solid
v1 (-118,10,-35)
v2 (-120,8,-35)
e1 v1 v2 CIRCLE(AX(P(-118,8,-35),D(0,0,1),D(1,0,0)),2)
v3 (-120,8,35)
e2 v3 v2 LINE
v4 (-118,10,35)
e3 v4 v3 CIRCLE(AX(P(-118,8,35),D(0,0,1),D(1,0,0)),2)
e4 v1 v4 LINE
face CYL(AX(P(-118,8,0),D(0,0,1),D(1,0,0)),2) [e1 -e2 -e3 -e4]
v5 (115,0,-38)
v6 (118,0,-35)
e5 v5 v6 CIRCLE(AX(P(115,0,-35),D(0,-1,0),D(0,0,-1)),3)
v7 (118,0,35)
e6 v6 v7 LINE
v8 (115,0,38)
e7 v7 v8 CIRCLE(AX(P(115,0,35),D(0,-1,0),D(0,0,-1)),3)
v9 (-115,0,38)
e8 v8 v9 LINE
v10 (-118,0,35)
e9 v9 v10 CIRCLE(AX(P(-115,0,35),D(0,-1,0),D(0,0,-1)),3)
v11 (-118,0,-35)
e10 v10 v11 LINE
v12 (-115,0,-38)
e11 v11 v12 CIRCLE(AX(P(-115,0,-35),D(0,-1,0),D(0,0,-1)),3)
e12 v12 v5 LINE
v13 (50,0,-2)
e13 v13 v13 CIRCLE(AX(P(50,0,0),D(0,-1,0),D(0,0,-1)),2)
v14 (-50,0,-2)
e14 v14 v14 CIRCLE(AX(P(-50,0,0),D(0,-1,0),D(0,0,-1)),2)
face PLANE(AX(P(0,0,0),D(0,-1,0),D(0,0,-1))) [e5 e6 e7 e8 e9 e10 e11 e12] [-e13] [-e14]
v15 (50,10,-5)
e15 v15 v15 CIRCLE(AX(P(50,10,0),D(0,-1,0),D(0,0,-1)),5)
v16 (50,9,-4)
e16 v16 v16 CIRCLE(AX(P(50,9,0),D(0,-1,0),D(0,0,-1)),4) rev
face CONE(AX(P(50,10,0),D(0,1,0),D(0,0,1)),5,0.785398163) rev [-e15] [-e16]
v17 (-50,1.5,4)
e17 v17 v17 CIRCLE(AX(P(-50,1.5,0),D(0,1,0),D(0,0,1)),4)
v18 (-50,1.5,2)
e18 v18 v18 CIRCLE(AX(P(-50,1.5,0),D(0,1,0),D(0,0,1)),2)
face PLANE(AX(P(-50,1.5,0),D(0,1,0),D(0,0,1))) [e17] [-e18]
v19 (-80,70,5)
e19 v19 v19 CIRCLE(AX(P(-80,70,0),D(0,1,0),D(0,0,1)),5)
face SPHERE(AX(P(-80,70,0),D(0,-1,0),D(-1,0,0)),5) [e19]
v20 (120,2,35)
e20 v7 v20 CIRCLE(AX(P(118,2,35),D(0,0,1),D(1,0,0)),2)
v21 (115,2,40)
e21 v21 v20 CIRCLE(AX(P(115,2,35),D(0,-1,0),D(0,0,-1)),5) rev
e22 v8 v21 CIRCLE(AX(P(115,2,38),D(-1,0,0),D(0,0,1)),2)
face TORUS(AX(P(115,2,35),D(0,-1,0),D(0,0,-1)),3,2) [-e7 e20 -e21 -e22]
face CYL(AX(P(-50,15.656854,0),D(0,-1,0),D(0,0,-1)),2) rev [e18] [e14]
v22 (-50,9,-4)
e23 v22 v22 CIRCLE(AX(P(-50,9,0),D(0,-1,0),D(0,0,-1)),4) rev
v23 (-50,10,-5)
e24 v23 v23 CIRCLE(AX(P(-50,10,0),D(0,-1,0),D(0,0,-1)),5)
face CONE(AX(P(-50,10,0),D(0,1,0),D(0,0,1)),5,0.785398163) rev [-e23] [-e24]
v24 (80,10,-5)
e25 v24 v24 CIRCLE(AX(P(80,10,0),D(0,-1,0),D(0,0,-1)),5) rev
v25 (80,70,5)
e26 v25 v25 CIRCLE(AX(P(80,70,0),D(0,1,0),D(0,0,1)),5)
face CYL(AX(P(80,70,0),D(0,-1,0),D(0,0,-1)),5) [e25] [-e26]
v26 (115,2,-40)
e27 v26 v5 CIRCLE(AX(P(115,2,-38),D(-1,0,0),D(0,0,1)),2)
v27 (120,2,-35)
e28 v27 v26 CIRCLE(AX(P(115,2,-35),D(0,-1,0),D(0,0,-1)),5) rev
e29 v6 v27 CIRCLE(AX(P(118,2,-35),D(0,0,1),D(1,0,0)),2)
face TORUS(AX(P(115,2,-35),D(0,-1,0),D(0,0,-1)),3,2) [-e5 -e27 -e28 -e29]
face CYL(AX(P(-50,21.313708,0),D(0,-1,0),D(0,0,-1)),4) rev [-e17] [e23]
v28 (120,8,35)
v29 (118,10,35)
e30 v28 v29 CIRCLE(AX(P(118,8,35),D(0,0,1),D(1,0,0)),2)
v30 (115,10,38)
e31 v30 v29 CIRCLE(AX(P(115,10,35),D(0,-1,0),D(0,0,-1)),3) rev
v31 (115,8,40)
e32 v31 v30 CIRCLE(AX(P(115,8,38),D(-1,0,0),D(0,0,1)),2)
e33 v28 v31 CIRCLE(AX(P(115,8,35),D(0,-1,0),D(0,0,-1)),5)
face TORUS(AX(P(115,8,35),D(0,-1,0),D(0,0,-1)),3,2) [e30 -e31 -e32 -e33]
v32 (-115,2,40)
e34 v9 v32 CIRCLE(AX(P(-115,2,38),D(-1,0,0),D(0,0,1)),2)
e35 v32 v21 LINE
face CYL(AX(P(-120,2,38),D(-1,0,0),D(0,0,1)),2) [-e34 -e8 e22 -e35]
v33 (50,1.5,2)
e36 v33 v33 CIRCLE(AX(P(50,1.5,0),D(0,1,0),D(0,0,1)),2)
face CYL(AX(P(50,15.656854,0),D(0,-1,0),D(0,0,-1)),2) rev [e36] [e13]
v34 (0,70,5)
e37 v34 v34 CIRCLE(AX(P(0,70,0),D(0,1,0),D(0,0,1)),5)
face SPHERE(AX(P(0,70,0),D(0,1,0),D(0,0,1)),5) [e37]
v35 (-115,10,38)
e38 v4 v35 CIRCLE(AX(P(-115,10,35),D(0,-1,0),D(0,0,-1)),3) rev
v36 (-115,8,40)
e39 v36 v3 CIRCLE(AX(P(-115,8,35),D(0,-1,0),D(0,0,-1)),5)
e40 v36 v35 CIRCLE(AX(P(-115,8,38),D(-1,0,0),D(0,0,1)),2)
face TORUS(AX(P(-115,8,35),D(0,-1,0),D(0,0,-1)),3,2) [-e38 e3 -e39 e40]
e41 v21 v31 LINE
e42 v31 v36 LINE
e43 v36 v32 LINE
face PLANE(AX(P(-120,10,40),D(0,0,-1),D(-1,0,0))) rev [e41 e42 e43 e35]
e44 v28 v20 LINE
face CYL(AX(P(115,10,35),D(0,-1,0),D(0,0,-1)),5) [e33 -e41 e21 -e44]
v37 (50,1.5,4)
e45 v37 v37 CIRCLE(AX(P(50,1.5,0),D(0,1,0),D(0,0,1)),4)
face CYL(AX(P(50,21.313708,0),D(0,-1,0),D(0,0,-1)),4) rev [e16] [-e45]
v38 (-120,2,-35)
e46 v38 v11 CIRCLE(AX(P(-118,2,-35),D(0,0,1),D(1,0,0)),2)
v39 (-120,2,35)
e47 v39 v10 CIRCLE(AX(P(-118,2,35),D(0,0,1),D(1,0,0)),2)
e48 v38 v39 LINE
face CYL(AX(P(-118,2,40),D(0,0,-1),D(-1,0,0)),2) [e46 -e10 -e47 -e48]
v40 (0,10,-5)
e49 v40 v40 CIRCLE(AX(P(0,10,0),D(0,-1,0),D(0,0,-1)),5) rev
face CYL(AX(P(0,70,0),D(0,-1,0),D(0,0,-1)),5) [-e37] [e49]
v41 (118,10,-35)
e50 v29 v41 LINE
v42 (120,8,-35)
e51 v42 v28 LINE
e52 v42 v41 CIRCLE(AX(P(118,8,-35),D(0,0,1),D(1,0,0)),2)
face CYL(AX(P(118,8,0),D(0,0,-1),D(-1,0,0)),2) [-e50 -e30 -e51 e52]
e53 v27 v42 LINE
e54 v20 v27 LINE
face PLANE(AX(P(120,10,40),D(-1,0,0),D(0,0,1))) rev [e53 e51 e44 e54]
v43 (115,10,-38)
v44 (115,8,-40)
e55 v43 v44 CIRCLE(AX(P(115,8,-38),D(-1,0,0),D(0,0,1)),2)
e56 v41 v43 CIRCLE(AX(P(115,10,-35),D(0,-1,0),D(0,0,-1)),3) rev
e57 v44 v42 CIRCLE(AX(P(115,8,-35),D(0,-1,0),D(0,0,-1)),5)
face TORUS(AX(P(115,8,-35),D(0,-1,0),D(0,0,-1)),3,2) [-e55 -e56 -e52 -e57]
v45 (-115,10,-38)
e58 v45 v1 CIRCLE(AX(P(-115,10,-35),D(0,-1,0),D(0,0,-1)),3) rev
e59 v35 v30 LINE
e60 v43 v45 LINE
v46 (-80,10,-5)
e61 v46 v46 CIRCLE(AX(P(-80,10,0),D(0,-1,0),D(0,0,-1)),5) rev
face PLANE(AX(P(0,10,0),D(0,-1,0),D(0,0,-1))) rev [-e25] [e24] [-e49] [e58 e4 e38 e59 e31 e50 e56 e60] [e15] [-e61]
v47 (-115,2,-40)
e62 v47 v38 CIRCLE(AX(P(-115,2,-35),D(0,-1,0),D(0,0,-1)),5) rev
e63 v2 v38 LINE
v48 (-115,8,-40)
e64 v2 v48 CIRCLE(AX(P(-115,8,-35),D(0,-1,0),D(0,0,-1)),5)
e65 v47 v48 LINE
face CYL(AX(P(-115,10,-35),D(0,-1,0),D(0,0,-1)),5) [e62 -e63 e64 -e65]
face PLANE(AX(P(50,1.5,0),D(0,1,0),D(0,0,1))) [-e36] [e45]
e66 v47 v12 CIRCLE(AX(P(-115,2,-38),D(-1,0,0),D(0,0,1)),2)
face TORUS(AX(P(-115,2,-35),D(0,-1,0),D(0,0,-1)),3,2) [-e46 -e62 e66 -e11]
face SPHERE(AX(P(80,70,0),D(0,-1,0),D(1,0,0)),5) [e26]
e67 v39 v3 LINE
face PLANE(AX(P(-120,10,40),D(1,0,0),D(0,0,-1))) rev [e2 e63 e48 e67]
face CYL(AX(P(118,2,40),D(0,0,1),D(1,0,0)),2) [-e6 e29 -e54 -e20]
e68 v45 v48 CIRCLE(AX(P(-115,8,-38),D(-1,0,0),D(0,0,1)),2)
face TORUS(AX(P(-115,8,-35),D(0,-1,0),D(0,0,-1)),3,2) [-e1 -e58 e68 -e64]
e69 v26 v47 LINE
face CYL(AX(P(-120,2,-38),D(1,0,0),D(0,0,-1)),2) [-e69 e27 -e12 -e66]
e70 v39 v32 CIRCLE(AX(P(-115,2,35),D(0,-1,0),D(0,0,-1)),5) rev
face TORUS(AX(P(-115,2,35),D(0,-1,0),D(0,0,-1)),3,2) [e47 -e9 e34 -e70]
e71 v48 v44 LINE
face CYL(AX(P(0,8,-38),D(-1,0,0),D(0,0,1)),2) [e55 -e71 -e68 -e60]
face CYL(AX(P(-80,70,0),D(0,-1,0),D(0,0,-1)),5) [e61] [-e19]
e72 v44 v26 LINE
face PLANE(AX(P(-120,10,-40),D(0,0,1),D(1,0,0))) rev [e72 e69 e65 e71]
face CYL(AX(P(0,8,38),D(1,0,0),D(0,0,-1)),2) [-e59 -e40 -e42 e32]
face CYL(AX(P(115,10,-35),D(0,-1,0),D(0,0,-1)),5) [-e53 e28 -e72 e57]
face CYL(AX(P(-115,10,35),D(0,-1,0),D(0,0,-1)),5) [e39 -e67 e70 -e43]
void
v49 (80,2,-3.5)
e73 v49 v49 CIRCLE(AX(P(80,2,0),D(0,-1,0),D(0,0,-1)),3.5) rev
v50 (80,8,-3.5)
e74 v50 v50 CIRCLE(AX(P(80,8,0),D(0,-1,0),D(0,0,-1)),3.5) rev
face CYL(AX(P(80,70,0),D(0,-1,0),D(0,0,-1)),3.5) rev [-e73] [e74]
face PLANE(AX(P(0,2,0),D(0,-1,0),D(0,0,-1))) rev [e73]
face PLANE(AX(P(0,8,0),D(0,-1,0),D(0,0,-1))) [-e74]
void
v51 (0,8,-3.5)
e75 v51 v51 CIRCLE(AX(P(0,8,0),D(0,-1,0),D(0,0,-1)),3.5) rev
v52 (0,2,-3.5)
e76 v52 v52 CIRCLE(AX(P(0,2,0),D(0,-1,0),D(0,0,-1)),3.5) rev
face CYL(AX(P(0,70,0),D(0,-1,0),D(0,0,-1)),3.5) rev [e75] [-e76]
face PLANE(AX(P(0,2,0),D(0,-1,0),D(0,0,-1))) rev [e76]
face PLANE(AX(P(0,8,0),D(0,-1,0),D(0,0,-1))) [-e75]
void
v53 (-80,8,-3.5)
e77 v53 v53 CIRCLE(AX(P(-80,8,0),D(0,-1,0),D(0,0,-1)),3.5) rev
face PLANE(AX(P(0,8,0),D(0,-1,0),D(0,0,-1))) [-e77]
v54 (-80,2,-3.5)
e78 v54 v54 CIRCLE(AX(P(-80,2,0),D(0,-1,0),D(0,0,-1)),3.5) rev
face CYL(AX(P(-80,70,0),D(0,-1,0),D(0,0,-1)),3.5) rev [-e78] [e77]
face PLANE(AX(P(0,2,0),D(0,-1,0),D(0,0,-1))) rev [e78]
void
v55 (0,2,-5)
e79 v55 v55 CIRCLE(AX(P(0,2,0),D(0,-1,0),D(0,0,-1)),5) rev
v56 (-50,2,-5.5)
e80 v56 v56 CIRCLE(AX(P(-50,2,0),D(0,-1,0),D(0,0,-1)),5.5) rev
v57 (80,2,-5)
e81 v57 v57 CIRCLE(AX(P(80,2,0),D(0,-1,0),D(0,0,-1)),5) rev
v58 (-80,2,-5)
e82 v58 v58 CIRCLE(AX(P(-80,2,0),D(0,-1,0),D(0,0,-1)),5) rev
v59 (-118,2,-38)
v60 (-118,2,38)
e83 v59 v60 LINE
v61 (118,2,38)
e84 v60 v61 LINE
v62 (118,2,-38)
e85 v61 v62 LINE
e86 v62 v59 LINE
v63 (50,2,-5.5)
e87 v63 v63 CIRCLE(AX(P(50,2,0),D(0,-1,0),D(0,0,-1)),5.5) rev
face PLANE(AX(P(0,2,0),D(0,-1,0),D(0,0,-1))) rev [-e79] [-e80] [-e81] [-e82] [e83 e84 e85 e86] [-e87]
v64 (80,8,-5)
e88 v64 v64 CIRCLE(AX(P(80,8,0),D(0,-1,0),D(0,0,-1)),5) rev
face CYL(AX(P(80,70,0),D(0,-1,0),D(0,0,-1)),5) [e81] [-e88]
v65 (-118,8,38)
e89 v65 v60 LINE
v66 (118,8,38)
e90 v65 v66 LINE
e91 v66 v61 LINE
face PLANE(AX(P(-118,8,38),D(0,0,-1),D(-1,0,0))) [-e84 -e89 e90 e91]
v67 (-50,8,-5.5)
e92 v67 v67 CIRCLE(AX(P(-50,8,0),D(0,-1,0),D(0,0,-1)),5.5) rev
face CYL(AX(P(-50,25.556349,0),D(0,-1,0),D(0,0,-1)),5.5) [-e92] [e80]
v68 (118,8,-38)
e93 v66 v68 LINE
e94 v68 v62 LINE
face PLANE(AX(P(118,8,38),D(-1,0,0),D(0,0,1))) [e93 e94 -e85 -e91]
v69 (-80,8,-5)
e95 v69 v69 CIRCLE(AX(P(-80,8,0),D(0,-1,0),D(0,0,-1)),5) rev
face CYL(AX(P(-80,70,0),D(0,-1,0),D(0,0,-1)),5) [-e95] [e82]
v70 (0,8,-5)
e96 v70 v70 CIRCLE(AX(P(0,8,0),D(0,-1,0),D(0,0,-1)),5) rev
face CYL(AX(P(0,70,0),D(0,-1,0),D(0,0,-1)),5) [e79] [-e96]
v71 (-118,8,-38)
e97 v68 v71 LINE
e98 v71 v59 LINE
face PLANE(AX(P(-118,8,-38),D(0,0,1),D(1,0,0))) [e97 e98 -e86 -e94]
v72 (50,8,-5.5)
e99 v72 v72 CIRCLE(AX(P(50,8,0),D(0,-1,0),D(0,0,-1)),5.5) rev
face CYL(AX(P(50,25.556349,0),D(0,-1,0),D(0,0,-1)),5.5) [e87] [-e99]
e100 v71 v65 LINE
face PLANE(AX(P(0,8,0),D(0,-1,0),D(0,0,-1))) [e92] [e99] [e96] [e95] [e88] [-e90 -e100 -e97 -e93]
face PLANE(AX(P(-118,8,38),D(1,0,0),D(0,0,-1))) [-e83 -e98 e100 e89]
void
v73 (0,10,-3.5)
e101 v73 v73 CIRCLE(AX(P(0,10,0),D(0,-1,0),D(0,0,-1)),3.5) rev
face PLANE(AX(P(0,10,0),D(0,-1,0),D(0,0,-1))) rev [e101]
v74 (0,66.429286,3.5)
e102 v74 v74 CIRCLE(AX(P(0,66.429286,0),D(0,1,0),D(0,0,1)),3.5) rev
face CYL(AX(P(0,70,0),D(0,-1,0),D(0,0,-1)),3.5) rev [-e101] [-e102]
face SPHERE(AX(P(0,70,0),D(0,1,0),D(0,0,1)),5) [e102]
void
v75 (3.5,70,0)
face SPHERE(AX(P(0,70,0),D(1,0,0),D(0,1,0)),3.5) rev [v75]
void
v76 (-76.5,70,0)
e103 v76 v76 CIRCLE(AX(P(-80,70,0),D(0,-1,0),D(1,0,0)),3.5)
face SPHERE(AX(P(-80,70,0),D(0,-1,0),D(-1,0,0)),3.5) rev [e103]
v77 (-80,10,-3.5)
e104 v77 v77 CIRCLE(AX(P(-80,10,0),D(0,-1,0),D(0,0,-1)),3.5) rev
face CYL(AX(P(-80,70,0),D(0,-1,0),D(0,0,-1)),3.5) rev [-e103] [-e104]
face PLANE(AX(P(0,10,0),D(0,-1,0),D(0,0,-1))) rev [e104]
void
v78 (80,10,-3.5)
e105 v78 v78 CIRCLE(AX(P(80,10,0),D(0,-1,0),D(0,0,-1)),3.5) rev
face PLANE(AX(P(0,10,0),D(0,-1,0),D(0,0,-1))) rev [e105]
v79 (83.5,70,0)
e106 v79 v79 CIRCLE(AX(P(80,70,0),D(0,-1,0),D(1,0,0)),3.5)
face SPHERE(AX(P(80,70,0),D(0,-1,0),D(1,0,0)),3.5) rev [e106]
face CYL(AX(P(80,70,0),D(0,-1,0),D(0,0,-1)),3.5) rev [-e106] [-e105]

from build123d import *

# Parameters (mm, degrees)
SKETCH_4_W          = 240
SKETCH_4_H          = 80
EXTRUDE_2_DEPTH     = 10
CUT_EXTRUDE_START   = 2
SKETCH_5_W          = 236
SKETCH_5_H          = 76
CUT_EXTRUDE_1_DEPTH = 6
FILLET_2_R          = 5
FILLET_1_R          = 2
SKETCH_6_R          = 5
SKETCH_6_R_2        = 3.5
EXTRUDE_3_DEPTH     = 70
CUT_EXTRUDE_2_REACH = 148.068
CUT_EXTRUDE_START_2 = 1.5
SKETCH_7_R          = 4
SKETCH_8_R          = 5.5
SKETCH_8_R_2        = 4
EXTRUDE_4_DEPTH     = 10
SKETCH_9_R          = 2
CUT_EXTRUDE_3_DEPTH = 10
CHAMFER_1_SIZE      = 1


# Read off the part's stored shape, not the designer's step: 旋转1, 旋转2
with BuildPart() as part:
    # 草图4 → 凸台-拉伸2 (new body)
    with BuildSketch(Plane(origin=(0, 0, 0), x_dir=(1, 0, 0), z_dir=(0, 1, 0))):
        Rectangle(SKETCH_4_W, SKETCH_4_H)
    extrude(amount=EXTRUDE_2_DEPTH)

    # 草图5 → 切除-拉伸1 (cut)
    with BuildSketch(Plane(origin=(0, 0, 0), x_dir=(1, 0, 0), z_dir=(0, 1, 0)).offset(CUT_EXTRUDE_START)):
        Rectangle(SKETCH_5_W, SKETCH_5_H)
    extrude(amount=CUT_EXTRUDE_1_DEPTH, mode=Mode.SUBTRACT)

    # 圆角2
    fillet_2_edges = [part.edges().sort_by_distance(p)[0] for p in [
        (120, 5, 40),
        (-120, 5, 40),
        (-120, 5, -40),
        (120, 5, -40),
    ]]
    fillet(fillet_2_edges, radius=FILLET_2_R)

    # 圆角1
    fillet_1_edges = [part.edges().sort_by_distance(p)[0] for p in [
        (120, 0, 0),
        (120, 10, 0),
        (0, 0, 40),
        (-120, 0, 0),
        (0, 0, -40),
        (118.535533906, 0, -38.535533906),
        (-118.535533906, 0, -38.535533906),
        (-118.535533906, 0, 38.535533906),
        (118.535533906, 0, 38.535533906),
        (0, 10, 40),
        (0, 10, -40),
        (-120, 10, 0),
        (118.535533906, 10, -38.535533906),
        (-118.535533906, 10, -38.535533906),
        (-118.535533906, 10, 38.535533906),
        (118.535533906, 10, 38.535533906),
    ]]
    fillet(fillet_1_edges, radius=FILLET_1_R)

    # 草图6 → 凸台-拉伸3 (add)
    # profile 1 of 3: a face of its own
    with BuildSketch(Plane(origin=(0, 0, 0), x_dir=(1, 0, 0), z_dir=(0, 1, 0))):
        with Locations(Location((-80, 0, 0), (0, 0, 90))):
            Circle(SKETCH_6_R)
        with Locations(Location((-80, 0, 0), (0, 0, 90))):
            Circle(SKETCH_6_R_2, mode=Mode.SUBTRACT)
    # profile 2 of 3: a face of its own
    with BuildSketch(Plane(origin=(0, 0, 0), x_dir=(1, 0, 0), z_dir=(0, 1, 0))):
        with Locations(Location((0, 0, 0), (0, 0, 90))):
            Circle(SKETCH_6_R)
        with Locations(Location((0, 0, 0), (0, 0, 90))):
            Circle(SKETCH_6_R_2, mode=Mode.SUBTRACT)
    # profile 3 of 3: a face of its own
    with BuildSketch(Plane(origin=(0, 0, 0), x_dir=(1, 0, 0), z_dir=(0, 1, 0))):
        with Locations(Location((80, 0, 0), (0, 0, 90))):
            Circle(SKETCH_6_R)
        with Locations(Location((80, 0, 0), (0, 0, 90))):
            Circle(SKETCH_6_R_2, mode=Mode.SUBTRACT)
    extrude(amount=EXTRUDE_3_DEPTH)

    # 切除-拉伸2: up to this face of the body (flat: up to its plane)
    cut_extrude_2_end = Plane(part.part.faces().sort_by_distance((115.520645245, 10, 0))[0])
    # 草图7 → 切除-拉伸2 (cut, up to the picked face)
    with BuildSketch(Plane(origin=(0, 0, 0), x_dir=(1, 0, 0), z_dir=(0, 1, 0)).offset(CUT_EXTRUDE_START_2), mode=Mode.PRIVATE) as cut_extrude_2_sk1:
        with Locations(Location((-50, 0, 0), (0, 0, 90))):
            Circle(SKETCH_7_R)
    cut_extrude_2_tool1 = split(extrude(cut_extrude_2_sk1.sketch, amount=CUT_EXTRUDE_2_REACH, mode=Mode.PRIVATE), bisect_by=cut_extrude_2_end, keep=Keep.BOTH, mode=Mode.PRIVATE)
    # 草图7 → 切除-拉伸2 (cut, up to the picked face)
    with BuildSketch(Plane(origin=(0, 0, 0), x_dir=(1, 0, 0), z_dir=(0, 1, 0)).offset(CUT_EXTRUDE_START_2), mode=Mode.PRIVATE) as cut_extrude_2_sk2:
        with Locations(Location((50, 0, 0), (0, 0, 90))):
            Circle(SKETCH_7_R)
    cut_extrude_2_tool2 = split(extrude(cut_extrude_2_sk2.sketch, amount=CUT_EXTRUDE_2_REACH, mode=Mode.PRIVATE), bisect_by=cut_extrude_2_end, keep=Keep.BOTH, mode=Mode.PRIVATE)
    add(cut_extrude_2_tool1.solids().sort_by(Axis((-50, 1.5, 0), (0, 1, 0)))[0], mode=Mode.SUBTRACT)
    add(cut_extrude_2_tool2.solids().sort_by(Axis((50, 1.5, 0), (0, 1, 0)))[0], mode=Mode.SUBTRACT)

    # 草图8 → 凸台-拉伸4 (add)
    # profile 1 of 2: a face of its own
    with BuildSketch(Plane(origin=(0, 0, 0), x_dir=(1, 0, 0), z_dir=(0, 1, 0))):
        with Locations(Location((-50, 0, 0), (0, 0, 90))):
            Circle(SKETCH_8_R)
        with Locations(Location((-50, 0, 0), (0, 0, 90))):
            Circle(SKETCH_8_R_2, mode=Mode.SUBTRACT)
    # profile 2 of 2: a face of its own
    with BuildSketch(Plane(origin=(0, 0, 0), x_dir=(1, 0, 0), z_dir=(0, 1, 0))):
        with Locations(Location((50, 0, 0), (0, 0, 90))):
            Circle(SKETCH_8_R)
        with Locations(Location((50, 0, 0), (0, 0, 90))):
            Circle(SKETCH_8_R_2, mode=Mode.SUBTRACT)
    extrude(amount=EXTRUDE_4_DEPTH)

    # 草图9 → 切除-拉伸3 (cut)
    with BuildSketch(Plane(origin=(0, 0, 0), x_dir=(1, 0, 0), z_dir=(0, 1, 0))):
        with Locations(Location((-50, 0, 0), (0, 0, 90))):
            Circle(SKETCH_9_R)
        with Locations(Location((50, 0, 0), (0, 0, 90))):
            Circle(SKETCH_9_R)
    extrude(amount=CUT_EXTRUDE_3_DEPTH, mode=Mode.SUBTRACT)

    # 倒角1
    chamfer_1_edges = [part.edges().sort_by_distance(p)[0] for p in [
        (-50, 10, 4),
        (50, 10, 4),
    ]]
    chamfer(chamfer_1_edges, length=CHAMFER_1_SIZE)

    # 旋转1 outline → 旋转1 (revolve)
    with BuildSketch(Plane.XY):
        with BuildLine():
            Line((3.5, 70), (5, 69.999999998))
            ThreePointArc((5, 69.999999998), (3.535533907, 73.535533905), (0, 75))
            Line((0, 75), (0, 73.5))
            ThreePointArc((0, 73.5), (2.474873734, 72.474873734), (3.5, 70))
        make_face()
        with BuildLine():
            ThreePointArc((3.5, 70), (2.474873734, 67.525126266), (0, 66.5))
            Line((0, 66.5), (0, 65))
            ThreePointArc((0, 65), (1.890294811, 65.371092405), (3.500000004, 66.429285789))
            Line((3.500000004, 66.429285789), (3.5, 70))
        make_face()
    revolve(axis=Axis((0, 0, 0), (0, 1, 0)))

    # 旋转2 outline → 旋转2 (revolve)
    with BuildSketch(Plane(origin=(-80, 0, 0), x_dir=(1, 0, 0), z_dir=(0, 0, 1))):
        with BuildLine():
            Line((3.5, 69.999999996), (5, 69.999999996))
            ThreePointArc((5, 69.999999996), (3.535533907, 73.535533905), (0, 75))
            Line((0, 75), (0, 73.5))
            ThreePointArc((0, 73.5), (2.474873735, 72.474873733), (3.5, 69.999999996))
        make_face()
    revolve(axis=Axis((-80, 0, 0), (0, 1, 0)))

    # 草图13 → 旋转3 (revolve)
    with BuildSketch(Plane.XY):
        with BuildLine():
            Line((83.5, 70), (85, 70))
            ThreePointArc((85, 70), (83.535533906, 73.535533906), (80, 75))
            Line((80, 75), (80, 73.5))
            ThreePointArc((80, 73.5), (82.474873734, 72.474873734), (83.5, 70))
        make_face()
    revolve(axis=Axis((80, -930, 0), (0, 1, 0)))


solid = part.part
